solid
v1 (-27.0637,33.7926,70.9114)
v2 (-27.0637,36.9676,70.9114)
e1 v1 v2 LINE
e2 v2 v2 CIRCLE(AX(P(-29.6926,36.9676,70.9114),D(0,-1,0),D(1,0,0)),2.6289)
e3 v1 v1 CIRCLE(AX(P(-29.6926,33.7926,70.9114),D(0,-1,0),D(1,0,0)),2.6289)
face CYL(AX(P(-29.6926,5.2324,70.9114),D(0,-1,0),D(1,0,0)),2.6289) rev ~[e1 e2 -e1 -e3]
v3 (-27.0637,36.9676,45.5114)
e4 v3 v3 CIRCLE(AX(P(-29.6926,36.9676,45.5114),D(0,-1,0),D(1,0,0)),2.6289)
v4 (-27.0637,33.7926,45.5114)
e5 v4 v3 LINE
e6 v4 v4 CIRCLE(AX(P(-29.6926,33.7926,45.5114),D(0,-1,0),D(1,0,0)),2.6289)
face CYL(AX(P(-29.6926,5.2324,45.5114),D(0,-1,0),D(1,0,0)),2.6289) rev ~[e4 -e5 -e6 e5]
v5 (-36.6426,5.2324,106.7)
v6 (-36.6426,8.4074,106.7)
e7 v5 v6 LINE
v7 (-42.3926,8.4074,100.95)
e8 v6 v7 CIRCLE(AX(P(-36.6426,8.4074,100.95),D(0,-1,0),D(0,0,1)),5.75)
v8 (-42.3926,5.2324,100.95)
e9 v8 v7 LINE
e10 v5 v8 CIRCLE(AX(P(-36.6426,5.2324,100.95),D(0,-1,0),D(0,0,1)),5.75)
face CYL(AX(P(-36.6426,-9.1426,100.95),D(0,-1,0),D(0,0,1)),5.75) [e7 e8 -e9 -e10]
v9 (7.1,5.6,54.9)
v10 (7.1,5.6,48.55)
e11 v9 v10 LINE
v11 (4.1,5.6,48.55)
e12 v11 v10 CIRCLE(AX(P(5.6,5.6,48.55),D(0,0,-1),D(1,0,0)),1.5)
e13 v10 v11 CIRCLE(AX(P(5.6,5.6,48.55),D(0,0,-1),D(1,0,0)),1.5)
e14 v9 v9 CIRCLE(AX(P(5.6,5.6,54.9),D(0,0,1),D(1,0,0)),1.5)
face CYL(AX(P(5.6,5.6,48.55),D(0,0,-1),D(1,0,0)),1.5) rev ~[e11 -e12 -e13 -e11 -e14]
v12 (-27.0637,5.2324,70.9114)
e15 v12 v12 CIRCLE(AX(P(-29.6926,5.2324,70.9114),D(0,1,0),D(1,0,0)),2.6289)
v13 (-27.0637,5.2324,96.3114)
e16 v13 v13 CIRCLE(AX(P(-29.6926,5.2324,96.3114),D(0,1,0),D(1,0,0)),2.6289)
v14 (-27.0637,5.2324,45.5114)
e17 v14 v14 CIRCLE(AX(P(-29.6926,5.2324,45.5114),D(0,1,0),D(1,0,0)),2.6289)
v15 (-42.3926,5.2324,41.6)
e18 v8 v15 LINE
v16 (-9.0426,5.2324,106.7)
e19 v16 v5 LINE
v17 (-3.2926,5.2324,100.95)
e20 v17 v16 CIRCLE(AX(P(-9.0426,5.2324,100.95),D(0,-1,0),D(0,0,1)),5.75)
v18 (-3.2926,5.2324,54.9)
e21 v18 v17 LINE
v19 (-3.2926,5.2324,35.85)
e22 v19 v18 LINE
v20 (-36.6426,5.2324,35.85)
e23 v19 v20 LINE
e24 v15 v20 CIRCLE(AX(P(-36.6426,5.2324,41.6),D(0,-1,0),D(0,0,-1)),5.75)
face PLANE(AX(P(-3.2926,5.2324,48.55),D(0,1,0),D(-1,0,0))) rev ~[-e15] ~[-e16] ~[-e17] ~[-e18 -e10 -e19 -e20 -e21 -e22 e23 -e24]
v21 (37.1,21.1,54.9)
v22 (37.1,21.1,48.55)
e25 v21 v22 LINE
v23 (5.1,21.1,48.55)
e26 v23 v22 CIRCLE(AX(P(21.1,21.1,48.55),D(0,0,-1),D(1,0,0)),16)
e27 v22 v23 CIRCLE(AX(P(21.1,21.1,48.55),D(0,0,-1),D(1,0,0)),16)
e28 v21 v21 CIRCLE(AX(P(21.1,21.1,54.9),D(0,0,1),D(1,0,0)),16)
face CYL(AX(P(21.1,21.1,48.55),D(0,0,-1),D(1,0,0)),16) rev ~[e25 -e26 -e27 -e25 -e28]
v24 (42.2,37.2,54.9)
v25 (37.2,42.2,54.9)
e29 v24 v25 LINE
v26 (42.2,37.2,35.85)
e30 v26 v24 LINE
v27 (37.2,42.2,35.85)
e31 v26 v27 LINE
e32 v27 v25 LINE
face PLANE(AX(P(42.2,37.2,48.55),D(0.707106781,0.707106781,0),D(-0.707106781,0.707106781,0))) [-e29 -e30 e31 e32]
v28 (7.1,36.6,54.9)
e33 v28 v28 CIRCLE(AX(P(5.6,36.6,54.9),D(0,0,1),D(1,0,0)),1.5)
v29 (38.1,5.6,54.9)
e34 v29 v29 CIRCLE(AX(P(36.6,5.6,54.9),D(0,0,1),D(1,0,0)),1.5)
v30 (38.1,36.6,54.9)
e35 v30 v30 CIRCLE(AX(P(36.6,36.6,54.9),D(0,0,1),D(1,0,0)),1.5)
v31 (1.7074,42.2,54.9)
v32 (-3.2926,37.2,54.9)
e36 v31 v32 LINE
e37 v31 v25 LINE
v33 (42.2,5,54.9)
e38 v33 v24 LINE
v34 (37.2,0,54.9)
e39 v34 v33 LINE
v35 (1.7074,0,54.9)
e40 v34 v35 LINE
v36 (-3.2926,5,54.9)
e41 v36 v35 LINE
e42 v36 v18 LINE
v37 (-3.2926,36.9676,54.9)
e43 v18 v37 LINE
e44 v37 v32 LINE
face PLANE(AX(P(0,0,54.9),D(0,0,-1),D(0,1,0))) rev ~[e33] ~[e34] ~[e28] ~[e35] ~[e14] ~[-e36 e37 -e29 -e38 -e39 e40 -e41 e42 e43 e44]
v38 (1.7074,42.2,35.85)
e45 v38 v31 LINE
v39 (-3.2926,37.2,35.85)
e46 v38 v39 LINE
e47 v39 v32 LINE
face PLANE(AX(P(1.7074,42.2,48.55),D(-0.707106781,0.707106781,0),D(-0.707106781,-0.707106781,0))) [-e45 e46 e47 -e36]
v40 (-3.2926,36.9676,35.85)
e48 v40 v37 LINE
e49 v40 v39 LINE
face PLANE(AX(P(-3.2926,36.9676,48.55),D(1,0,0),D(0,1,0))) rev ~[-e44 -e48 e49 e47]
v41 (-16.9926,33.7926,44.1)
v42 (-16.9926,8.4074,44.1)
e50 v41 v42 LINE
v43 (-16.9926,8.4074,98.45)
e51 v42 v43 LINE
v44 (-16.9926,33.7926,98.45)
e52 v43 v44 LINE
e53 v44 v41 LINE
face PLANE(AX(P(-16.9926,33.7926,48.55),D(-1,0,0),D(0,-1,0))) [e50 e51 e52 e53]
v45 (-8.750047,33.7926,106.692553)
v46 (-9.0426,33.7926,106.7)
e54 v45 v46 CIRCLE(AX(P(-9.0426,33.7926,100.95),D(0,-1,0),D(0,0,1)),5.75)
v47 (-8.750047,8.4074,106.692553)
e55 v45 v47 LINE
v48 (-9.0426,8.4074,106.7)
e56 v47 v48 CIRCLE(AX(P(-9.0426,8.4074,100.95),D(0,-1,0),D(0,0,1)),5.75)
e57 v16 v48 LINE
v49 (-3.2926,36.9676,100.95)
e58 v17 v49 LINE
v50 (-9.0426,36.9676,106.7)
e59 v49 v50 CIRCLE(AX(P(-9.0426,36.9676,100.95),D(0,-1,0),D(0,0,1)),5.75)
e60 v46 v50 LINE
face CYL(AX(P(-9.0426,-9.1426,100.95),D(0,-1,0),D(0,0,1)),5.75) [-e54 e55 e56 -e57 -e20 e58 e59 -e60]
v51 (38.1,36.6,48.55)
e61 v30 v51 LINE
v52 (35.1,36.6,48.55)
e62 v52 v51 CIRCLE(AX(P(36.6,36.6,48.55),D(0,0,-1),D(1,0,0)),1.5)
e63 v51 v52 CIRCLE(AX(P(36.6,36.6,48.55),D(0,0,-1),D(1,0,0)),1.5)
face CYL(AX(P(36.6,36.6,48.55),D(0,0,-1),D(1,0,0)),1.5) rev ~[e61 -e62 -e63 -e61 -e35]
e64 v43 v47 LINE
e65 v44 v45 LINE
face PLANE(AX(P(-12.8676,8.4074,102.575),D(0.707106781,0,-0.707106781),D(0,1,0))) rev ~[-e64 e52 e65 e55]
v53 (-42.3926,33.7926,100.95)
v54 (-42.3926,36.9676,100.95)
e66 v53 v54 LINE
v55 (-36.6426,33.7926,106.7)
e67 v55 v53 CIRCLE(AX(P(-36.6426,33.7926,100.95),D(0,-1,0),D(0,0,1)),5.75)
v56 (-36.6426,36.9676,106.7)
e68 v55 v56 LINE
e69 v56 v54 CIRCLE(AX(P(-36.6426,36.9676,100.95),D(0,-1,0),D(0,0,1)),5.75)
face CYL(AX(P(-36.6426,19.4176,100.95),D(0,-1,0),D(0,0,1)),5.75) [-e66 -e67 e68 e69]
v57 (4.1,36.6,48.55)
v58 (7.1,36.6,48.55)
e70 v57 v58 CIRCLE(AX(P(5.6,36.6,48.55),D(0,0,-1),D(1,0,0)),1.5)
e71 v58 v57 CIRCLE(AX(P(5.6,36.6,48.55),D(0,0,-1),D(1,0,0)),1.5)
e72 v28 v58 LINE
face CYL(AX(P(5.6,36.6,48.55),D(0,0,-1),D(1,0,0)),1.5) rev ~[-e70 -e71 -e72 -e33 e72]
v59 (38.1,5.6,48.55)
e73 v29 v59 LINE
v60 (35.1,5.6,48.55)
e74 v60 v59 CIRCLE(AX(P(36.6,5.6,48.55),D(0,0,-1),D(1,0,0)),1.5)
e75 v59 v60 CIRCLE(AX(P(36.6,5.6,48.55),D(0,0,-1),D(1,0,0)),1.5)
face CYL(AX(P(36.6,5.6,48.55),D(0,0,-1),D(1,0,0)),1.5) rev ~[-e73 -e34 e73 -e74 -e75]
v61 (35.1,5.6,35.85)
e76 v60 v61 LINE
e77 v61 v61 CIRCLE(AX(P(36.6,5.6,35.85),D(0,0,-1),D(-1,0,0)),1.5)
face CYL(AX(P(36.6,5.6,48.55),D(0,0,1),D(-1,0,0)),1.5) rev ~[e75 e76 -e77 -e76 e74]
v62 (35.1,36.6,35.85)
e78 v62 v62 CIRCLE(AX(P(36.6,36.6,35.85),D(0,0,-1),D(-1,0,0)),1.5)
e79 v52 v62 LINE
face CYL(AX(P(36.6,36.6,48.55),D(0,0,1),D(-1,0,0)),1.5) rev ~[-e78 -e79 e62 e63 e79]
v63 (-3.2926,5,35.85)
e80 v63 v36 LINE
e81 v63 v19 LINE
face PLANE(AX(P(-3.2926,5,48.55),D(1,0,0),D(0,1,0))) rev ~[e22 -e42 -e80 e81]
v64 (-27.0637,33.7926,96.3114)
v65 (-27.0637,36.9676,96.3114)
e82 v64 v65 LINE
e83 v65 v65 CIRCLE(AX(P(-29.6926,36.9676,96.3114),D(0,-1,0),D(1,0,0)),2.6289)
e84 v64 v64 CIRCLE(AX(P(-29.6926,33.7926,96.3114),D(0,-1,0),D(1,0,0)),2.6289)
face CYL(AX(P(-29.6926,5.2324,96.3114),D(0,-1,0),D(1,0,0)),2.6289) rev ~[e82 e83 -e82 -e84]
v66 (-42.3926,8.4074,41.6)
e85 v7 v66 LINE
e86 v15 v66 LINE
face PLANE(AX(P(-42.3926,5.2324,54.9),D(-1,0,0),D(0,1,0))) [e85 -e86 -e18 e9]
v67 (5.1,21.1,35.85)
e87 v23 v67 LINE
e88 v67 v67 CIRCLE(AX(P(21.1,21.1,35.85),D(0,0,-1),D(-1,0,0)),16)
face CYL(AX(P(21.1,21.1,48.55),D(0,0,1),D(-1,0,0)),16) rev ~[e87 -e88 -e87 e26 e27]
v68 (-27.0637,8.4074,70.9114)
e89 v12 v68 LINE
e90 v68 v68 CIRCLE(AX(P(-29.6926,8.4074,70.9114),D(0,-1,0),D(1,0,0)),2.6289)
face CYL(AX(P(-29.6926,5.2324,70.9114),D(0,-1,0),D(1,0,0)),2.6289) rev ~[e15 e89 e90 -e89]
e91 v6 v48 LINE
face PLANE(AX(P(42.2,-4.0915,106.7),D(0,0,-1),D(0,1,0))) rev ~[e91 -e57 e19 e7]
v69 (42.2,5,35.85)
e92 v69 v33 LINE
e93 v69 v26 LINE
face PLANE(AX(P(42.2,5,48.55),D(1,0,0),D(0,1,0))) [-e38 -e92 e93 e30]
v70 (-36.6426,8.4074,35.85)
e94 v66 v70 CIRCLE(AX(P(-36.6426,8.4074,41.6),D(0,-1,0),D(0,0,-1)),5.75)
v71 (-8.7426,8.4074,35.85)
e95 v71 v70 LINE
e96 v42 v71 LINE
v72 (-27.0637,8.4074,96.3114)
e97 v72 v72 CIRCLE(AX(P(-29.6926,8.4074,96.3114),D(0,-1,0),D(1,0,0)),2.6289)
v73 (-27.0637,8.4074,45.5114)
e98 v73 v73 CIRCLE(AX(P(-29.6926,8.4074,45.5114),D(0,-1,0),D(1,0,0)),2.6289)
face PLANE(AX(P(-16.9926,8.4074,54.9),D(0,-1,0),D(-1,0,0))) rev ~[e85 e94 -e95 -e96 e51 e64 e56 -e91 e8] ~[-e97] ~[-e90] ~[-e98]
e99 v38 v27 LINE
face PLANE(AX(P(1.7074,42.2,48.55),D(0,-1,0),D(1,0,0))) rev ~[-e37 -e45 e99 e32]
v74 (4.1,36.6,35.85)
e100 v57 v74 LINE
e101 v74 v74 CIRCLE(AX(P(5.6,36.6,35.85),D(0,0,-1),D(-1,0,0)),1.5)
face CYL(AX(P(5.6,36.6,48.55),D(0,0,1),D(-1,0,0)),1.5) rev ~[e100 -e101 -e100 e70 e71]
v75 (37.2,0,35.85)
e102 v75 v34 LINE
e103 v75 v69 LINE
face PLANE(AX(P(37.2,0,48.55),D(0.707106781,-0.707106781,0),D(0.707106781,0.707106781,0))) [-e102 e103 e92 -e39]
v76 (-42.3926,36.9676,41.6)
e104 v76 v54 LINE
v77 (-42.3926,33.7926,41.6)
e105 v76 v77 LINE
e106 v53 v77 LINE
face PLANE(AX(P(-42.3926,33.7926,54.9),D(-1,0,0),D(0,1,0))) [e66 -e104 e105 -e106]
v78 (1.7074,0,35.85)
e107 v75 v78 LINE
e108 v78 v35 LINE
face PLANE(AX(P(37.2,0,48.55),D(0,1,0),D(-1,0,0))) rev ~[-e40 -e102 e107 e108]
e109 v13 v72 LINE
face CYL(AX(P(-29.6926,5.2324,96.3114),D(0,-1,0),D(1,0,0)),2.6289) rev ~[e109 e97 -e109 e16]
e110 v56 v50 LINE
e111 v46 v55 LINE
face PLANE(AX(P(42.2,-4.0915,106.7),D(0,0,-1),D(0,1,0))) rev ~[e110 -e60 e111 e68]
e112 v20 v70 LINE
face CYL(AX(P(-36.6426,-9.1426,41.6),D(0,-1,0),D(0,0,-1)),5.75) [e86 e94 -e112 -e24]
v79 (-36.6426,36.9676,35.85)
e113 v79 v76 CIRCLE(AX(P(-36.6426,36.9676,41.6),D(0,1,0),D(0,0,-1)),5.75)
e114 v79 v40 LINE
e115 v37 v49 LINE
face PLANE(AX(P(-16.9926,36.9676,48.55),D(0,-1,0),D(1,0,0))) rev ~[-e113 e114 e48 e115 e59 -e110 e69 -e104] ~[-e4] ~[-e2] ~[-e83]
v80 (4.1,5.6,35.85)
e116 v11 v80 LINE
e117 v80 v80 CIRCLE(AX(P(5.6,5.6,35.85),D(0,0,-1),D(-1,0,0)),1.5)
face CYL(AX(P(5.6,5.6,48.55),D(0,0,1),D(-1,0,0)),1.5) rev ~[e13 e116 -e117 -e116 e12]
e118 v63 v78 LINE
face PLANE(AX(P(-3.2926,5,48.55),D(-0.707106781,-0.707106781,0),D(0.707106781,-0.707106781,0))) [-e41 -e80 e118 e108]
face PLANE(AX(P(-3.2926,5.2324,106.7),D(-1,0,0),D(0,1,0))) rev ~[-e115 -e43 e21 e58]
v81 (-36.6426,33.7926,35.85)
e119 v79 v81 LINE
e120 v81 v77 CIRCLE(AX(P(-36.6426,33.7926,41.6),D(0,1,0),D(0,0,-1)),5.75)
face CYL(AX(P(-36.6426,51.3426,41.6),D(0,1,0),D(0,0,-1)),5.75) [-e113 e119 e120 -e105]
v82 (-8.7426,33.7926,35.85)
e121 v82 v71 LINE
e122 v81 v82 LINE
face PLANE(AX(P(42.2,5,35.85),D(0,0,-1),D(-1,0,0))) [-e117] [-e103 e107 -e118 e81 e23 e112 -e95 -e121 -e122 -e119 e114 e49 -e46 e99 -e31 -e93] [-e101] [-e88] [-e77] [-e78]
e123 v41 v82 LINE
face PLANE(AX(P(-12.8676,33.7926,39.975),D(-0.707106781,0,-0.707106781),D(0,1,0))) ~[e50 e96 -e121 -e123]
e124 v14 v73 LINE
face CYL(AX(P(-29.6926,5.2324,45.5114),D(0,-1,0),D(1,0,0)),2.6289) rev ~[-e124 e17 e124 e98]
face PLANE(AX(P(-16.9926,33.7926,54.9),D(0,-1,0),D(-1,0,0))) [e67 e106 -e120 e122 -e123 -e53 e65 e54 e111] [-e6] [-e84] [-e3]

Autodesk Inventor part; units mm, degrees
ref_plane "YZ Plane" through (0, 0, 0) normal (1, 0, 0) x (0, 1, 0)
ref_plane "XZ Plane" through (0, 0, 0) normal (0, 1, 0) x (-1, 0, 0)
ref_plane "XY Plane" through (0, 0, 0) normal (0, 0, 1) x (1, 0, 0)
sketch "Sketch1" plane through (0, 0, 0) normal (0, 0, 1) x (1, 0, 0)
  line L0 (0, 37.2) -> (5, 42.2)
  line L1 (37.2, 42.2) -> (42.2, 37.2)
  line L2 (42.2, 5) -> (37.2, 0)
  line L3 (5, 0) -> (0, 5)
  line L4 (0, 37.2) -> (0, 5)
  line L5 (37.2, 42.2) -> (5, 42.2)
  line L6 (42.2, 5) -> (42.2, 37.2)
  line L7 (5, 0) -> (37.2, 0)
  line L8 (0, 5) -> (0, 0)
  circle A0 centre (21.1, 21.1) radius 2.5
  circle A1 centre (5.6, 36.6) radius 1.5
  circle A2 centre (36.6, 36.6) radius 1.5
  circle A3 centre (36.6, 5.6) radius 1.5
  circle A4 centre (5.6, 5.6) radius 1.5
  dimension "d8" = 5
  dimension "d9" = 5
  dimension "d10" = 5
  dimension "d11" = 21.1
  dimension "d12" = 21.1
  dimension "d13" = 3
  dimension "d14" = 3
  dimension "d15" = 3
  dimension "d16" = 3
  dimension "d17" = 31
  dimension "d18" = 31
  dimension "d19" = 31
  dimension "d20" = 31
  dimension "d21" = 5.6
  dimension "d22" = 5.6
  dimension "d43" = 5.6
  dimension "d44" = 5.6
  dimension "d45" = 5.6
  dimension "d46" = 5.6
  dimension "d47" = 42.2
extrude "Extrusion1" add sketch "Sketch1" along normal blind 9.8
sketch "Sketch2" plane through (0, 0, 9.8) normal (0, 0, 1) x (1, 0, 0)
  circle A0 centre (21.1, 21.1) radius 2.5 projected
  circle A1 centre (5.6, 5.6) radius 1.5 projected
  circle A2 centre (36.6, 5.6) radius 1.5 projected
  circle A3 centre (36.6, 36.6) radius 1.5 projected
  circle A4 centre (5.6, 36.6) radius 1.5 projected
  line L0 (5, 42.2) -> (0, 37.2) projected
  line L1 (0, 37.2) -> (0, 5) projected
  line L2 (0, 5) -> (5, 0) projected
  line L3 (5, 0) -> (37.2, 0) projected
  line L4 (37.2, 0) -> (42.2, 5) projected
  line L5 (42.2, 5) -> (42.2, 37.2) projected
  line L6 (42.2, 37.2) -> (37.2, 42.2) projected
  line L7 (37.2, 42.2) -> (5, 42.2) projected
  point P0 (0, 0)
fillet "Fillet1" radius 0.25 8 edges at (21.1, 42.2, 9.8) (39.7, 39.7, 9.8) (42.2, 21.1, 9.8) (39.7, 2.5, 9.8) (21.1, 0, 9.8) (2.5, 2.5, 9.8) (0, 21.1, 9.8) (2.5, 39.7, 9.8)
extrude "Extrusion2" add sketch "Sketch2" along normal blind 31
sketch "Sketch3" plane through (0, 0, 40.8) normal (0, 0, 1) x (1, 0, 0)
  circle A0 centre (21.1, 21.1) radius 2.5 projected
  circle A1 centre (5.6, 36.6) radius 1.5 projected
  circle A2 centre (36.6, 36.6) radius 1.5 projected
  circle A3 centre (36.6, 5.6) radius 1.5 projected
  circle A4 centre (5.6, 5.6) radius 1.5 projected
  line L0 (5, 42.2) -> (0, 37.2) projected
  line L1 (0, 37.2) -> (0, 5) projected
  line L2 (0, 5) -> (5, 0) projected
  line L3 (5, 0) -> (37.2, 0) projected
  line L4 (37.2, 0) -> (42.2, 5) projected
  line L5 (42.2, 5) -> (42.2, 37.2) projected
  line L6 (42.2, 37.2) -> (37.2, 42.2) projected
  line L7 (37.2, 42.2) -> (5, 42.2) projected
  point P0 (0, 0)
fillet "Fillet2" radius 0.25 8 edges at (21.1, 42.2, 40.8) (39.7, 39.7, 40.8) (42.2, 21.1, 40.8) (39.7, 2.5, 40.8) (21.1, 0, 40.8) (2.5, 2.5, 40.8) (0, 21.1, 40.8) (2.5, 39.7, 40.8)
extrude "Extrusion3" add sketch "Sketch3" along normal blind 7.75
sketch "Sketch4" plane through (0, 0, 48.55) normal (0, 0, 1) x (1, 0, 0)
  circle A0 centre (21.1, 21.1) radius 2.5 projected
  circle A1 centre (21.1, 21.1) radius 16
  point P0 (0, 0)
  dimension "d31" = 32
extrude "Extrusion4" cut sketch "Sketch4" against normal blind 0.6
sketch "Sketch5" plane through (21.1, 21.1, 47.95) normal (0, 0, 1) x (1, 0, 0)
  circle A0 centre (0, 0) radius 2.5 projected
  circle A1 centre (0, 0) radius 16 projected
  circle A2 centre (0, 0) radius 11
  point P0 (-21.1, -21.1)
  dimension "d35" = 22
extrude "Extrusion5" add sketch "Sketch5" along normal blind 2.2 contours A2
fillet "Fillet3" radius 0.5 1 edges at (10.1, 21.1, 50.15)
sketch "Sketch6" plane through (21.1, 21.1, 50.15) normal (0, 0, 1) x (1, 0, 0)
  circle A0 centre (0, 0) radius 2.5 projected
  point P0 (-21.1, -21.1)
extrude "Extrusion6" add sketch "Sketch6" along normal blind 22.5
fillet "Fillet4" radius 0.5 1 edges at (18.6, 21.1, 72.65)
sketch "Sketch7" plane through (0, 0, 48.55) normal (0, 0, 1) x (1, 0, 0)
  circle A0 centre (21.1, 21.1) radius 16 projected
  circle A1 centre (5.6, 5.6) radius 1.5 projected
  circle A2 centre (36.6, 5.6) radius 1.5 projected
  circle A3 centre (36.6, 36.6) radius 1.5 projected
  circle A4 centre (5.6, 36.6) radius 1.5 projected
  line L0 (5, 42.2) -> (0, 37.2) projected
  line L1 (0, 37.2) -> (0, 5) projected
  line L2 (0, 5) -> (5, 0) projected
  line L3 (5, 0) -> (37.2, 0) projected
  line L4 (37.2, 0) -> (42.2, 5) projected
  line L5 (42.2, 5) -> (42.2, 37.2) projected
  line L6 (42.2, 37.2) -> (37.2, 42.2) projected
  line L7 (37.2, 42.2) -> (5, 42.2) projected
  point P0 (0, 0)
extrude "Extrusion7" add sketch "Sketch7" along normal blind 6.35
sketch "Sketch8" plane through (5, 0, 40.8) normal (0, -1, 0) x (1, 0, 0)
  point P0 (-5, -40.8)
sketch "Sketch9" plane through (5, 0, 40.8) normal (0, -1, 0) x (1, 0, 0)
  line L0 (0, 14.1) -> (-5, 14.1) projected
  line L1 (37.2, 0) -> (37.2, 14.1) projected
  line L2 (-5, 14.1) -> (37.2, 14.1)
  line L3 (37.2, 14.1) -> (37.2, 7.75)
  line L4 (37.2, 7.75) -> (-5, 7.75)
  line L5 (-5, 7.75) -> (-5, 14.1)
  line L6 (-5, 7.75) -> (48.466, 7.75)
  line L7 (48.466, 7.75) -> (48.466, -59.7117)
  line L8 (48.466, -59.7117) -> (-5, -59.7117)
  line L9 (-5, -59.7117) -> (-5, 7.75)
  point P0 (-5, -40.8)
  dimension "d50" = 6.35
extrude "Extrusion8" cut sketch "Sketch9" against normal blind 98.4 contours L4 L6 L7 L8 L9
sketch "Sketch10" plane through (21.1, 21.1, 48.55) normal (0, 0, -1) x (-1, 0, 0)
  circle A0 centre (0, 0) radius 11 projected
  circle A1 centre (0, 0) radius 2.5 projected
  circle A2 centre (0, 0) radius 2.5 projected
  point P0 (21.1, -21.1)
extrude "Extrusion9" cut sketch "Sketch10" against normal blind 76.85 contours A0 | A1
sketch "Sketch11" plane through (0, 5, 54.9) normal (-1, 0, 0) x (0, 0, 1)
  line L0 (-6.35, -5) -> (-6.35, 0) projected
  line L1 (0, 37.2) -> (-6.35, 37.2)
  line L2 (-6.35, 37.2) -> (-6.35, -5)
  line L3 (-6.35, -5) -> (0, -5)
  line L4 (0, -5) -> (0, 37.2)
  point P0 (-54.9, -5)
extrude "Extrusion10" add sketch "Sketch11" along normal blind 16.9926
sketch "Sketch12" plane through (0, 5, 54.9) normal (1, 0, 0) x (0, 0, -1)
  line L0 (6.35, 32.2) -> (0, 32.2) projected
  line L1 (6.35, 37.2) -> (6.35, 32.2) projected
  line L2 (0, 37.2) -> (6.35, 37.2) projected
  line L3 (0, 32.2) -> (0, 37.2) projected
  line L4 (6.35, 0) -> (0, 0) projected
  line L5 (0, -5) -> (0, 0) projected
  line L6 (6.35, -5) -> (0, -5) projected
  line L7 (6.35, 0) -> (6.35, -5) projected
  point P0 (54.9, -5)
extrude "Extrusion11" add sketch "Sketch12" along normal blind 3.9926
sketch "Sketch13" plane through (3.9926, 5, 54.9) normal (1, 0, 0) x (0, 0, -1)
  line L0 (6.35, 36.1926) -> (0, 36.1926) projected
  line L1 (6.35, 36.1926) -> (6.35, 37.2) projected
  line L2 (6.35, 37.2) -> (0, 37.2) projected
  line L3 (0, 37.2) -> (0, 36.1926) projected
  line L4 (0, -3.9926) -> (6.35, -3.9926) projected
  line L5 (0, -3.9926) -> (0, -5) projected
  line L6 (0, -5) -> (6.35, -5) projected
  line L7 (6.35, -5) -> (6.35, -3.9926) projected
  point P0 (54.9, -5)
extrude "Extrusion12" add sketch "Sketch13" along normal blind 3.9926
sketch "Sketch14" plane through (-16.9926, 5, 54.9) normal (-1, 0, 0) x (0, 0, 1)
  line L0 (0, -5) -> (0, 0) projected
  line L1 (-6.35, 0) -> (-6.35, 32.2) projected
  line L2 (0, -5) -> (-6.35, -5)
  line L3 (-6.35, -5) -> (-6.35, 3.4074)
  line L4 (-6.35, 3.4074) -> (0, 3.4074)
  line L5 (0, 3.4074) -> (0, -5)
  line L6 (-6.35, 37.2) -> (0, 37.2) projected
  line L7 (0, 37.2) -> (-6.35, 37.2)
  line L8 (-6.35, 37.2) -> (-6.35, 28.7926)
  line L9 (-6.35, 28.7926) -> (0, 28.7926)
  line L10 (0, 28.7926) -> (0, 37.2)
  point P0 (-54.9, -5)
  point P1 (-3.175, 28.7926)
  dimension "d61" = 8.4074
  dimension "d62" = 8.4074
extrude "Extrusion13" add sketch "Sketch14" along normal blind 25.4
sketch "Sketch15" plane through (-42.3926, 5, 54.9) normal (-1, 0, 0) x (0, 0, 1)
  line L0 (0, 3.4074) -> (-6.35, 3.4074)
  line L1 (-6.35, 3.4074) -> (-6.35, 0.2324)
  line L2 (-6.35, 0.2324) -> (0, 0.2324)
  line L3 (0, 0.2324) -> (0, 3.4074)
  line L4 (0, 37.2) -> (-6.35, 37.2) projected
  line L5 (-6.35, 37.2) -> (0, 37.2) construction
  line L6 (0, 37.2) -> (-6.35, 37.2) projected
  line L7 (-6.35, 37.2) -> (0, 37.2) projected
  line L8 (0, -5) -> (0, 3.4074) projected
  line L9 (0, 3.4074) -> (-6.35, 3.4074) projected
  line L10 (-6.35, 3.4074) -> (-6.35, -5) projected
  line L11 (-6.35, -5) -> (0, -5) projected
  line L12 (0, 28.7926) -> (0, 37.2) projected
  line L13 (-6.35, 37.2) -> (-6.35, 28.7926) projected
  line L14 (0, 28.7926) -> (-6.35, 28.7926)
  line L15 (-6.35, 28.7926) -> (-6.35, 31.9676)
  line L16 (-6.35, 31.9676) -> (0, 31.9676)
  line L17 (0, 31.9676) -> (0, 28.7926)
  line L18 (0, 37.2) -> (-6.35, 37.2) projected
  line L19 (-6.35, 37.2) -> (-6.35, 28.7926) projected
  line L20 (-6.35, 28.7926) -> (0, 28.7926) projected
  line L21 (0, 28.7926) -> (0, 37.2) projected
  point P0 (-54.9, -5)
  point P1 (0, 31.9676)
  point P2 (0, 0.2324)
  point P3 (-6.35, 0.2324)
  dimension "d66" = 3.175
  dimension "d68" = 3.175
extrude "Extrusion14" cut sketch "Sketch15" against normal blind 39.1 contours L8 L11 L10 L2 | L12 L16 L13 L4
chamfer "Chamfer1" distance 5 angle 45 2 edges at (-3.2926, 0, 51.725) (-3.2926, 42.2, 51.725)
sketch "Sketch16" plane through (42.2, 5, 48.55) normal (0, 0, -1) x (-1, 0, 0)
  point P0 (42.2, -5)
sketch "Sketch17" plane through (0, 0, 54.9) normal (0, 0, 1) x (1, 0, 0)
  line L0 (-3.2926, 36.9676) -> (-42.3926, 36.9676) projected
  line L1 (-42.3926, 5.2324) -> (-3.2926, 5.2324) projected
  line L2 (-3.2926, 36.9676) -> (-16.9772, 36.9676)
  line L3 (-16.9772, 36.9676) -> (-16.9772, 5.2324)
  line L4 (-16.9772, 5.2324) -> (-3.2926, 5.2324)
  line L5 (-3.2926, 5.2324) -> (-3.2926, 36.9676)
  point P0 (0, 0)
extrude "Extrusion15" add sketch "Sketch17" along normal blind 39.1
sketch "Sketch18" plane through (42.2, 5, 48.55) normal (0, 0, -1) x (-1, 0, 0)
  line L0 (59.1926, 3.4074) -> (59.1926, 28.7926) projected
  line L1 (84.5926, 0.2324) -> (84.5926, 3.4074) projected
  line L2 (59.1926, 3.4074) -> (84.5926, 3.4074)
  line L3 (84.5926, 3.4074) -> (84.5926, 0.2324)
  line L4 (84.5926, 0.2324) -> (59.1926, 0.2324)
  line L5 (59.1926, 0.2324) -> (59.1926, 3.4074)
  line L6 (59.1926, 28.7926) -> (84.5926, 28.7926) projected
  line L7 (59.1926, 32.131) -> (84.5926, 32.131)
  line L8 (84.5926, 32.131) -> (84.5926, 28.7926)
  line L9 (84.5926, 28.7926) -> (59.1926, 28.7926)
  line L10 (59.1926, 28.7926) -> (59.1926, 32.131)
  point P0 (42.2, -5)
extrude "Extrusion16" add sketch "Sketch18" along normal blind 12.7
sketch "Sketch19" plane through (42.2, 5, 48.55) normal (0, 0, 1) x (1, 0, 0)
  line L0 (-84.5926, 31.9676) -> (-57.74, 31.9676)
  line L1 (-57.74, 31.9676) -> (-57.74, 35.8031)
  line L2 (-57.74, 35.8031) -> (-84.5926, 35.8031)
  line L3 (-84.5926, 35.8031) -> (-84.5926, 31.9676)
  point P0 (-42.2, -5)
extrude "Extrusion17" cut sketch "Sketch19" against normal blind 25.8
sketch "Sketch20" plane through (0, 0, 94) normal (0, 0, 1) x (1, 0, 0)
  line L0 (-3.2926, 36.9676) -> (-16.9772, 36.9676) projected
  line L1 (-16.9772, 36.9676) -> (-16.9772, 5.2324) projected
  line L2 (-16.9772, 5.2324) -> (-3.2926, 5.2324) projected
  line L3 (-3.2926, 5.2324) -> (-3.2926, 36.9676) projected
  point P0 (0, 0)
extrude "Extrusion18" add sketch "Sketch20" along normal blind 12.7
sketch "Sketch21" plane through (0, 0, 54.9) normal (0, 0, 1) x (1, 0, 0)
  line L0 (-16.9772, 5.2324) -> (-16.9772, 36.9676) projected
  line L1 (-16.9772, 36.9676) -> (-42.3926, 36.9676) projected
  line L2 (-42.3926, 33.7926) -> (-42.3926, 36.9676) projected
  line L3 (-16.9926, 33.7926) -> (-42.3926, 33.7926) projected
  line L4 (-16.9926, 8.4074) -> (-16.9926, 33.7926) projected
  line L5 (-16.9926, 8.4074) -> (-42.3926, 8.4074) projected
  line L6 (-42.3926, 5.2324) -> (-42.3926, 8.4074) projected
  line L7 (-42.3926, 5.2324) -> (-16.9772, 5.2324) projected
  point P0 (0, 0)
extrude "Extrusion19" add sketch "Sketch21" along normal blind 51.95
sketch "Sketch22" plane through (-16.9772, 5.2324, 106.7) normal (1, 0, 0) x (0, 0, -1)
  line L0 (0, 0) -> (-13.0158, 0)
  line L1 (-13.0158, 0) -> (-13.0158, 37.0534)
  line L2 (-13.0158, 37.0534) -> (0, 37.0534)
  line L3 (0, 37.0534) -> (0, 0)
  point P0 (106.7, -5.2324)
extrude "Extrusion20" cut sketch "Sketch22" against normal blind 71.05
sketch "Sketch23" plane through (-3.2926, 5.2324, 48.55) normal (0, -1, 0) x (1, 0, 0)
  line L0 (-13.7, -12.7) -> (-39.1, -12.7) projected
  line L1 (-26.4, -12.7) -> (-26.4, 58.15)
  line L2 (0, 58.15) -> (-39.1, 58.15) projected
  line L3 (-26.4, 58.15) -> (-26.4, 47.7614)
  circle A0 centre (-26.4, 47.7614) radius 2.6289
  line L4 (-26.4, 47.7614) -> (-26.4, 22.3614)
  line L5 (-26.4, 22.3614) -> (-26.4, -3.0386)
  circle A1 centre (-26.4, 22.3614) radius 2.6289
  circle A2 centre (-26.4, -3.0386) radius 2.6289
  point P0 (3.2926, -48.55)
  dimension "d86" = 10.3886
  dimension "d87" = 5.2578
  dimension "d88" = 25.4
  dimension "d89" = 25.4
  dimension "d90" = 5.2578
  dimension "d91" = 5.2578
extrude "Extrusion21" cut sketch "Sketch23" against normal blind 133.45
sketch "Sketch24" plane through (0, 0, 106.7) normal (0, 0, 1) x (1, 0, 0)
  line L0 (-3.2926, 5.2324) -> (-42.3926, 5.2324) projected
  line L1 (-3.2926, 36.9676) -> (-9.6426, 36.9676)
  line L2 (-9.6426, 36.9676) -> (-9.6426, 5.2324)
  line L3 (-9.6426, 5.2324) -> (-3.2926, 5.2324)
  line L4 (-3.2926, 5.2324) -> (-3.2926, 36.9676)
  point P0 (0, 0)
  dimension "d95" = 6.35
extrude "Extrusion22" add sketch "Sketch24" along normal blind 6.35
sketch "Sketch25" plane through (-3.2926, 5.2324, 48.55) normal (0, -1, 0) x (1, 0, 0)
  line L0 (-6.35, 58.15) -> (-6.35, 64.5) projected
  line L1 (-6.35, 58.15) -> (52.4716, 58.15)
  line L2 (52.4716, 58.15) -> (52.4716, 64.5)
  line L3 (52.4716, 64.5) -> (-6.35, 64.5)
  line L4 (-6.35, 64.5) -> (-6.35, 58.15)
  point P0 (3.2926, -48.55)
extrude "Extrusion23" add sketch "Sketch25" along normal blind 7.6
sketch "Sketch26" plane through (-3.2926, 5.2324, 48.55) normal (0, 1, 0) x (1, 0, 0)
  line L0 (0, -58.15) -> (0, -64.5) projected
  line L1 (52.4716, -64.5) -> (0, -64.5) projected
  line L2 (52.4716, -58.15) -> (52.4716, -64.5) projected
  line L3 (0, -58.15) -> (52.4716, -58.15) projected
  point P0 (3.2926, 48.55)
extrude "Extrusion24" add sketch "Sketch26" along normal blind 55.35
sketch "Sketch27" plane through (0, 0, 54.9) normal (0, 0, 1) x (1, 0, 0)
  line L0 (-3.2926, 36.9676) -> (-3.2926, 5.2324) projected
  line L1 (-3.2926, 5.2324) -> (-3.2926, 5) projected
  line L2 (1.7074, 0) -> (-3.2926, 5) projected
  line L3 (37.2, 0) -> (1.7074, 0) projected
  line L4 (37.2, 0) -> (42.2, 5) projected
  line L5 (42.2, 5) -> (42.2, 37.2) projected
  line L6 (42.2, 37.2) -> (37.2, 42.2) projected
  line L7 (37.2, 42.2) -> (1.7074, 42.2) projected
  line L8 (-3.2926, 37.2) -> (1.7074, 42.2) projected
  line L9 (-3.2926, 37.2) -> (-3.2926, 36.9676) projected
  circle A0 centre (5.6, 36.6) radius 1.5 projected
  circle A1 centre (36.6, 36.6) radius 1.5 projected
  circle A2 centre (36.6, 5.6) radius 1.5 projected
  circle A3 centre (5.6, 5.6) radius 1.5 projected
  circle A4 centre (21.1, 21.1) radius 16 projected
  line L10 (-3.2926, -11.2491) -> (64.8812, -11.2491)
  line L11 (64.8812, -11.2491) -> (64.8812, 73.1738)
  line L12 (64.8812, 73.1738) -> (-3.2926, 73.1738)
  line L13 (-3.2926, 73.1738) -> (-3.2926, -11.2491)
  point P0 (0, 0)
extrude "Extrusion25" cut sketch "Sketch27" along normal blind 194.15 contours L13 L12 L11 L10 L2 L3 L4 L5 L6 L7 L8 | A0 | A1 | A2 | A3
sketch "Sketch28" plane through (-3.2926, -2.3676, 113.05) normal (1, 0, 0) x (0, 0, -1)
  line L0 (6.35, 10.775) -> (6.35, 36.1602) projected
  line L1 (0, 0) -> (0, 7.3676) projected
  line L2 (6.35, 0) -> (0, 0) projected
  line L3 (6.35, 7.3676) -> (6.35, 0) projected
  line L4 (6.35, 7.3676) -> (0, 7.3676) projected
  point P0 (113.05, 2.3676)
extrude "Extrusion26" cut sketch "Sketch28" against normal blind 28.6
sketch "Sketch29" plane through (42.2, 5, 113.05) normal (1, 0, 0) x (0, 0, -1)
  line L0 (6.35, 0) -> (0, 0) projected
  line L1 (6.35, 0) -> (-3.466, 0)
  line L2 (-3.466, 0) -> (-3.466, 41.9331)
  line L3 (-3.466, 41.9331) -> (6.35, 41.9331)
  line L4 (6.35, 41.9331) -> (6.35, 0)
  line L5 (6.35, 0) -> (-14.0561, 0)
  line L6 (-14.0561, 0) -> (-14.0561, -9.0915)
  line L7 (-14.0561, -9.0915) -> (6.35, -9.0915)
  line L8 (6.35, -9.0915) -> (6.35, 0)
  point P0 (113.05, -5)
  point P1 (1.8156, 0)
extrude "Extrusion27" cut sketch "Sketch29" against normal blind 115.4
sketch "Sketch30" plane through (42.2, 5, 48.55) normal (0, 0, -1) x (-1, 0, 0)
  line L0 (59.1926, 31.9676) -> (45.4926, 31.9676) projected
  line L1 (45.4926, 31.9676) -> (45.4926, 32.2) projected
  line L2 (40.4926, 37.2) -> (45.4926, 32.2) projected
  line L3 (40.4926, 37.2) -> (5, 37.2) projected
  line L4 (0, 32.2) -> (5, 37.2) projected
  line L5 (0, 0) -> (0, 32.2) projected
  line L6 (5, -5) -> (0, 0) projected
  line L7 (5, -5) -> (40.4926, -5) projected
  line L8 (45.4926, 0) -> (40.4926, -5) projected
  line L9 (45.4926, 0) -> (45.4926, 0.2324) projected
  line L10 (45.4926, 0.2324) -> (59.1926, 0.2324) projected
  line L11 (59.1926, 28.7926) -> (59.1926, 3.4074) projected
  circle A0 centre (21.1, 16.1) radius 16 projected
  circle A1 centre (36.6, 0.6) radius 1.5 projected
  circle A2 centre (5.6, 0.6) radius 1.5 projected
  circle A3 centre (5.6, 31.6) radius 1.5 projected
  circle A4 centre (36.6, 31.6) radius 1.5 projected
  line L12 (59.1926, 28.7926) -> (59.1926, 31.9676) projected
  line L13 (59.1926, 0.2324) -> (59.1926, 3.4074) projected
  point P0 (42.2, -5)
extrude "Extrusion28" add sketch "Sketch30" along normal up to surface (12.7 mm away)
chamfer "Chamfer2" distance 8.25 angle 45 1 edges at (-16.9926, 21.1, 35.85)
chamfer "Chamfer3" distance 8.25 angle 45 1 edges at (-16.9926, 21.1, 106.7)
fillet "Fillet7" radius 5.75 5 edges at (-3.2926, 21.1, 106.7) (-42.3926, 35.3801, 106.7) (-42.3926, 6.8199, 106.7) (-42.3926, 6.8199, 35.85) (-42.3926, 35.3801, 35.85)
properties part number "Nema 17 stepper motor.2ipt"
